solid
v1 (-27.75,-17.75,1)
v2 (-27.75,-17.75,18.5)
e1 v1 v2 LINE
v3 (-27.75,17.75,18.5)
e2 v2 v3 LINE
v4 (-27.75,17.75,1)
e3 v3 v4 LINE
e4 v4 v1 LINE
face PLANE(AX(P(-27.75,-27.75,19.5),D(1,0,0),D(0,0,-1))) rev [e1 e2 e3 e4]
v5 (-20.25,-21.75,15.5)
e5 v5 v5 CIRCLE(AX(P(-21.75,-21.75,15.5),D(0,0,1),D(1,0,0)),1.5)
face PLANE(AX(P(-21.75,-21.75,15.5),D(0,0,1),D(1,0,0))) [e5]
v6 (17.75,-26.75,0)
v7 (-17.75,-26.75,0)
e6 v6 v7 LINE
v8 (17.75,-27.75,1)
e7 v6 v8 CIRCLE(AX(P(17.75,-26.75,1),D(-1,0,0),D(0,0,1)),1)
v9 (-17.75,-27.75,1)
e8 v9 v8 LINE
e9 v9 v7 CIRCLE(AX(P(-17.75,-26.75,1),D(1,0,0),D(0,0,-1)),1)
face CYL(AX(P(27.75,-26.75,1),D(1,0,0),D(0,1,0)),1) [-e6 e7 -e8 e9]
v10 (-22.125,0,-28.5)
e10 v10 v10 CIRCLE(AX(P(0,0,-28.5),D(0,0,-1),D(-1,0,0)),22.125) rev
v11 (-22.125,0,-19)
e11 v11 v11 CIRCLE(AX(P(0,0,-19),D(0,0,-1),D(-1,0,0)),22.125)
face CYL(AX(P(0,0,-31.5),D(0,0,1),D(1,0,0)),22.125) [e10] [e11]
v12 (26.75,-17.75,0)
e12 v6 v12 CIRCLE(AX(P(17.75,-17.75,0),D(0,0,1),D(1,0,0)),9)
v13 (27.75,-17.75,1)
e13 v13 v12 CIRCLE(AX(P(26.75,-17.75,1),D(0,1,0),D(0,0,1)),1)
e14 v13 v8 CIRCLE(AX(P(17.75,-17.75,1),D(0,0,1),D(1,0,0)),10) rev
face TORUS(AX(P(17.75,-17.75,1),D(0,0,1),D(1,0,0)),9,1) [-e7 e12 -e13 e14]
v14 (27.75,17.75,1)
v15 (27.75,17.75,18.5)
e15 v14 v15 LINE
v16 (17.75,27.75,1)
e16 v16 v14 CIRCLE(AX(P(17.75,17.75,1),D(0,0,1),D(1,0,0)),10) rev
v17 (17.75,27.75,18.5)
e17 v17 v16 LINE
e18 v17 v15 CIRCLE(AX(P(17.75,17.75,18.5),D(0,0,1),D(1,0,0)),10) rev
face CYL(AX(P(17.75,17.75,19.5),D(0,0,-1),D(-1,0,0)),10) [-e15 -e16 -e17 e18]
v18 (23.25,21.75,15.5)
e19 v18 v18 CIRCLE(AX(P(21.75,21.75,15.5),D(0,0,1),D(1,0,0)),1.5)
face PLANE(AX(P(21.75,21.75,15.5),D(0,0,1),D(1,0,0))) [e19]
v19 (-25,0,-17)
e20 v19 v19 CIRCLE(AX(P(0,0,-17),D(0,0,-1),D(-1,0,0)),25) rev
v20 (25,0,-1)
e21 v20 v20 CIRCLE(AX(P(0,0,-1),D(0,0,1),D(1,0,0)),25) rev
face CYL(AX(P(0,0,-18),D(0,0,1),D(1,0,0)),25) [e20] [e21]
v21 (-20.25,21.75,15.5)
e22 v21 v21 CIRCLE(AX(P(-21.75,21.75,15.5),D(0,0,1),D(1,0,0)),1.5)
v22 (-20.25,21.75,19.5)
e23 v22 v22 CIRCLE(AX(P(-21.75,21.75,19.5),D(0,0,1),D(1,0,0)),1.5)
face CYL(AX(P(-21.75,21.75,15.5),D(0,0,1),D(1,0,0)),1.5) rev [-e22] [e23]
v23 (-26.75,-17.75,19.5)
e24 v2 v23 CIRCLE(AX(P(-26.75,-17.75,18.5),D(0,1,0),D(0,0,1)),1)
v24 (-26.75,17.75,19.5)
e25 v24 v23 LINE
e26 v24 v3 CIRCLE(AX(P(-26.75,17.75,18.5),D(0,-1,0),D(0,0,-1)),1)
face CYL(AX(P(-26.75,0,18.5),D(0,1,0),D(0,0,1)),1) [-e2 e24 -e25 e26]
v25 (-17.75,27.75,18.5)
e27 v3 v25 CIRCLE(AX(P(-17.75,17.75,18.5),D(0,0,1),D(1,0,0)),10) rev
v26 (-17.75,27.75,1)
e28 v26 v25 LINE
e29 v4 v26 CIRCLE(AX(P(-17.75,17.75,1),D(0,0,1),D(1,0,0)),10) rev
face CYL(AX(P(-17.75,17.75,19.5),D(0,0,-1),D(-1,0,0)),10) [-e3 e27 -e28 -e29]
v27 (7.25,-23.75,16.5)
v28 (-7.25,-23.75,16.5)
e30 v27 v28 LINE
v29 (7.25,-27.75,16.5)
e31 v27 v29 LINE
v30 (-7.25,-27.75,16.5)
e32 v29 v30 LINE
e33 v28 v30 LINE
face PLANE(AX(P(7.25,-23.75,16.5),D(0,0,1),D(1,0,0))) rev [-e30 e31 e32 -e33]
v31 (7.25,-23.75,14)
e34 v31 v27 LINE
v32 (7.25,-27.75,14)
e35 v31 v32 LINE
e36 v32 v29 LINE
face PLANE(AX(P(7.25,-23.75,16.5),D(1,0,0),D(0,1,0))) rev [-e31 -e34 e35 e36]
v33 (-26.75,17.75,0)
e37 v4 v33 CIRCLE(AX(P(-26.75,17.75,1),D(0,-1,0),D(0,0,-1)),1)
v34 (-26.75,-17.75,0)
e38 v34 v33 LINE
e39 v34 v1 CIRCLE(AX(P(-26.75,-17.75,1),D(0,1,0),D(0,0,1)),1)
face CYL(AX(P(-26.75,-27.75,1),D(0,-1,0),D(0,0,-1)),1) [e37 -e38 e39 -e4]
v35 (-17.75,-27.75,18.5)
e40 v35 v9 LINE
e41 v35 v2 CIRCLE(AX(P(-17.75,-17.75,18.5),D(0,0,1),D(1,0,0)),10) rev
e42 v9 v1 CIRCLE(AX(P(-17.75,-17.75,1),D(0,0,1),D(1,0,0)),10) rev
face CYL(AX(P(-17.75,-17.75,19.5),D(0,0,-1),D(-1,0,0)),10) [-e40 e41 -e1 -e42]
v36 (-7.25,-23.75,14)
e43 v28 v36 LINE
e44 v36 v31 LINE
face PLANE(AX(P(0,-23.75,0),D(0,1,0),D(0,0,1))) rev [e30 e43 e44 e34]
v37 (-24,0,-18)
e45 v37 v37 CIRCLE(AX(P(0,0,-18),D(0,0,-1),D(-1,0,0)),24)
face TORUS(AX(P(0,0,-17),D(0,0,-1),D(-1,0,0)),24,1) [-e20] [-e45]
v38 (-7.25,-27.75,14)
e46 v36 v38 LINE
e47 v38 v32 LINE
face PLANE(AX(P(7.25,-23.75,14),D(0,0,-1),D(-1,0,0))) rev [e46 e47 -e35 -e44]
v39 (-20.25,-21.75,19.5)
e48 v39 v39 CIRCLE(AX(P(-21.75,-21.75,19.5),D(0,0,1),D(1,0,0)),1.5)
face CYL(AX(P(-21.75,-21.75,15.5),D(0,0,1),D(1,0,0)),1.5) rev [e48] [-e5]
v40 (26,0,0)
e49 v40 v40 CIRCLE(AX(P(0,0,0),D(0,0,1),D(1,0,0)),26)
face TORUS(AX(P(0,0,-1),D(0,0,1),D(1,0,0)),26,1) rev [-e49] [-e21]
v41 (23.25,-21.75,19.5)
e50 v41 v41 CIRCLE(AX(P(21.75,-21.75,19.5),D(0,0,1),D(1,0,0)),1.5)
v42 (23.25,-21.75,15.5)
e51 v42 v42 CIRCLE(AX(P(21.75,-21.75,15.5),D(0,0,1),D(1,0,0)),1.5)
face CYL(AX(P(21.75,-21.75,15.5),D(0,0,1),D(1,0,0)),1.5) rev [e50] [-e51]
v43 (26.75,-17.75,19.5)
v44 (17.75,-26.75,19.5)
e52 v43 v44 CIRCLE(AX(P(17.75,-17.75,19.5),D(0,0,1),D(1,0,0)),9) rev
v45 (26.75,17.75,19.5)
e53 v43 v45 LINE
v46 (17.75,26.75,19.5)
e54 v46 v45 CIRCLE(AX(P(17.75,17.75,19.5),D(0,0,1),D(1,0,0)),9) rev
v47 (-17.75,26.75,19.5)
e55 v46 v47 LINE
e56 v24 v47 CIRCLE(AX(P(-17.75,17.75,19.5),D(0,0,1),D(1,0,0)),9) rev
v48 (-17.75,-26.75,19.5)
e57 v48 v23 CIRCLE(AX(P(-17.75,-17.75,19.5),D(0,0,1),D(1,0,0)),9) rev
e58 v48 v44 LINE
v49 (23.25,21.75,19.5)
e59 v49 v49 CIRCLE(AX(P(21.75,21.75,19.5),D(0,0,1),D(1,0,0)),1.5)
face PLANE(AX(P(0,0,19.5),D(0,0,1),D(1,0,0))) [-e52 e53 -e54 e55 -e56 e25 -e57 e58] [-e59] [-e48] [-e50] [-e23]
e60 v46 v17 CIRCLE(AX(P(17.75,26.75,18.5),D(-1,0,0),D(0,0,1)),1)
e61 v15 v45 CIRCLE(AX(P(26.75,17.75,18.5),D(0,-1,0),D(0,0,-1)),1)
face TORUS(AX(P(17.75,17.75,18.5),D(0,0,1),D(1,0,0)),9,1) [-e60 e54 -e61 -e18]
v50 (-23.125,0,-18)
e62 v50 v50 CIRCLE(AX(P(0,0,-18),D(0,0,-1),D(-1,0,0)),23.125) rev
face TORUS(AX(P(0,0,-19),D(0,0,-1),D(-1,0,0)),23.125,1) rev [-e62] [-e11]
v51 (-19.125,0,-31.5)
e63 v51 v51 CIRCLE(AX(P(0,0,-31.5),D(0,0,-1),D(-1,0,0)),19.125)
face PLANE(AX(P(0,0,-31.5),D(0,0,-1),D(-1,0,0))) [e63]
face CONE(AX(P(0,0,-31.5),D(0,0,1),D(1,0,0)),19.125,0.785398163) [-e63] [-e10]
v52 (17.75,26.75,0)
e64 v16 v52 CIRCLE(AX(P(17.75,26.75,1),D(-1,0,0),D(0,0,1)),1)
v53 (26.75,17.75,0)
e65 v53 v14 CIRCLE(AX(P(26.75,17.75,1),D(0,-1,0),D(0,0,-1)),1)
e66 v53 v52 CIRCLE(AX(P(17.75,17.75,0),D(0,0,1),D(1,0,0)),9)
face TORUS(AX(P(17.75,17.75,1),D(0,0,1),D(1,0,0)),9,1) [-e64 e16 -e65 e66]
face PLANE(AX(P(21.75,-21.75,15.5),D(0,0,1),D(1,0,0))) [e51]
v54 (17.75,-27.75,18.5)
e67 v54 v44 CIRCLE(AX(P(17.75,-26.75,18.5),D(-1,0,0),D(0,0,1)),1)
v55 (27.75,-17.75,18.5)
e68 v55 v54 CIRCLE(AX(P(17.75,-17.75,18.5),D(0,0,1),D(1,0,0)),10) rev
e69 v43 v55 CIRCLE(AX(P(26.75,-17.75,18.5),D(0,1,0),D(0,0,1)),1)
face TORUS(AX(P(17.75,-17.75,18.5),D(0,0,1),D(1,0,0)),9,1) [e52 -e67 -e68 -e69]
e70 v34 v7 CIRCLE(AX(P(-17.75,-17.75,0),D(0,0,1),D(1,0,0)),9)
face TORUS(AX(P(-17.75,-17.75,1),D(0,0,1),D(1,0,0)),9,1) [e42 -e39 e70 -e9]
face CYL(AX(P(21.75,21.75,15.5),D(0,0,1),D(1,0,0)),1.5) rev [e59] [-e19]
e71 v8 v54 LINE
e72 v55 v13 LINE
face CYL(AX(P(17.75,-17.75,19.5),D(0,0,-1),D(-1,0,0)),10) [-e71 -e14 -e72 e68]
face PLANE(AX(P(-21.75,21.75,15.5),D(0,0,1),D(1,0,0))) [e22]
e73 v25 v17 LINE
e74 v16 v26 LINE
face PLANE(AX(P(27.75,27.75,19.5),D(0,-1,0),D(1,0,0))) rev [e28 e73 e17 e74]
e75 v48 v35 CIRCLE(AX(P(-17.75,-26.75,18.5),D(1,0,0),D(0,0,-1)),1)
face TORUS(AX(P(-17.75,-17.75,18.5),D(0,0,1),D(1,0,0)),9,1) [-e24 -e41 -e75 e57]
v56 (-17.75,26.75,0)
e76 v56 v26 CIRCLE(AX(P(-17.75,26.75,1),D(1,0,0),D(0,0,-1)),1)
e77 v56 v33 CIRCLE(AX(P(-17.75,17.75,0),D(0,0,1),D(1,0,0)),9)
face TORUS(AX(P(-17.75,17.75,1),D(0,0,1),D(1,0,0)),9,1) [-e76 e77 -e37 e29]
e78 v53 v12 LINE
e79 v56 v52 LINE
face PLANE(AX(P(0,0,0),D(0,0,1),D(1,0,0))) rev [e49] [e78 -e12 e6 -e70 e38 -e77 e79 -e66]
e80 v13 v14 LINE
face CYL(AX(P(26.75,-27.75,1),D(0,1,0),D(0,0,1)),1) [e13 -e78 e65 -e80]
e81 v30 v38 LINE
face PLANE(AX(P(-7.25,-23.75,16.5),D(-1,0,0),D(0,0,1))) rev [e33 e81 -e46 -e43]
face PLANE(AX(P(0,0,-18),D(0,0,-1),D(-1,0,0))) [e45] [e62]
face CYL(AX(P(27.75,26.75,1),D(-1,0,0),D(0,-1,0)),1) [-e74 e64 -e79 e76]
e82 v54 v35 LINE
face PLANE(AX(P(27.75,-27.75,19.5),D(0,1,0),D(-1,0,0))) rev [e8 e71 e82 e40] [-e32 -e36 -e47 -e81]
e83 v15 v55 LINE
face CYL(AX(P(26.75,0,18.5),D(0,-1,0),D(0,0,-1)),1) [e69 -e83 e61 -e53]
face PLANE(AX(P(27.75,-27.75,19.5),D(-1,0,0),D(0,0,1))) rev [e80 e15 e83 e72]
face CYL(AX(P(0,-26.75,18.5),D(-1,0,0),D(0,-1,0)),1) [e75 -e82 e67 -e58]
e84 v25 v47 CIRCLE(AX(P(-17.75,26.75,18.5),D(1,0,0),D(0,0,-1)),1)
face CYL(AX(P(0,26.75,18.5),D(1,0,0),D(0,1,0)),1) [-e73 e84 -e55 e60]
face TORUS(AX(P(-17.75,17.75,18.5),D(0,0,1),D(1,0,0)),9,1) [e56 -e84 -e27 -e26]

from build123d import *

# Parameters (mm, degrees)
ESQUISSE1_W             = 55.5
ESQUISSE1_H             = 55.5
BOSS_EXTRU_1_DEPTH      = 19.5
ESQUISSE2_R             = 25
BOSS_EXTRU_2_DEPTH      = 18
ESQUISSE3_R             = 22.125
BOSS_EXTRU_3_DEPTH      = 13.5
CHANFREIN1_SIZE         = 3
CONG_1_R                = 1
CONG_2_R                = 10
ESQUISSE4_R             = 1.5
ENL_V_MAT_EXTRU_1_DEPTH = 4
ESQUISSE5_W             = 14.5
ESQUISSE5_H             = 2.5
ENL_V_MAT_EXTRU_2_DEPTH = 4


with BuildPart() as part:
    # Esquisse1 → Boss.-Extru.1 (new body)
    with BuildSketch(Plane.XY):
        Rectangle(ESQUISSE1_W, ESQUISSE1_H)
    extrude(amount=BOSS_EXTRU_1_DEPTH)

    # Esquisse2 → Boss.-Extru.2 (add)
    with BuildSketch(Plane(origin=(0, 0, 0), x_dir=(-1, 0, 0), z_dir=(0, 0, -1))):
        Circle(ESQUISSE2_R)
    extrude(amount=BOSS_EXTRU_2_DEPTH)

    # Esquisse3 → Boss.-Extru.3 (add)
    with BuildSketch(Plane(origin=(0, 0, -18), x_dir=(-1, 0, 0), z_dir=(0, 0, -1))):
        Circle(ESQUISSE3_R)
    extrude(amount=BOSS_EXTRU_3_DEPTH)

    # Chanfrein1
    chanfrein1_edges = [part.edges().sort_by_distance(p)[0] for p in [
        (22.125, 0, -31.5),
    ]]
    chamfer(chanfrein1_edges, length=CHANFREIN1_SIZE)

    # Congé1
    cong_1_edges = [part.edges().sort_by_distance(p)[0] for p in [
        (27.75, 0, 19.5),
        (25, 0, 0),
        (25, 0, -18),
        (0, 27.75, 19.5),
        (22.125, 0, -18),
        (-27.75, 0, 19.5),
        (0, 27.75, 0),
        (27.75, 0, 0),
        (0, -27.75, 0),
        (-27.75, 0, 0),
        (0, -27.75, 19.5),
    ]]
    fillet(cong_1_edges, radius=CONG_1_R)

    # Congé2
    # the kernel refuses this fillet: 10 mm, written as the material it takes off along each edge
    with BuildSketch(Plane(origin=(17.75, -17.75, 19.5), x_dir=(0, -1, 0), z_dir=(-1, 0, 0))) as cong_2_piece_1:
        with BuildLine():
            CenterArc((9, -1), 1, 0, 90)
            Line((10, -1), (10, 0))
            Line((10, 0), (9, 0))
        make_face()
    revolve(axis=Axis((17.75, -17.75, 19.5), (0, 0, 1)), revolution_arc=90, mode=Mode.SUBTRACT)
    with BuildSketch(Plane(origin=(-17.75, -17.75, 19.5), x_dir=(-1, 0, 0), z_dir=(0, 1, 0))) as cong_2_piece_2:
        with BuildLine():
            CenterArc((9, -1), 1, 0, 90)
            Line((10, -1), (10, 0))
            Line((10, 0), (9, 0))
        make_face()
    revolve(axis=Axis((-17.75, -17.75, 19.5), (0, 0, 1)), revolution_arc=90, mode=Mode.SUBTRACT)
    with BuildSketch(Plane(origin=(17.75, 17.75, 19.5), x_dir=(1, 0, 0), z_dir=(0, -1, 0))) as cong_2_piece_3:
        with BuildLine():
            CenterArc((9, -1), 1, 0, 90)
            Line((10, -1), (10, 0))
            Line((10, 0), (9, 0))
        make_face()
    revolve(axis=Axis((17.75, 17.75, 19.5), (0, 0, 1)), revolution_arc=90, mode=Mode.SUBTRACT)
    with BuildSketch(Plane(origin=(-17.75, 17.75, 19.5), x_dir=(0, 1, 0), z_dir=(1, 0, 0))) as cong_2_piece_4:
        with BuildLine():
            CenterArc((9, -1), 1, 0, 90)
            Line((10, -1), (10, 0))
            Line((10, 0), (9, 0))
        make_face()
    revolve(axis=Axis((-17.75, 17.75, 19.5), (0, 0, 1)), revolution_arc=90, mode=Mode.SUBTRACT)
    with BuildSketch(Plane(origin=(17.75, 17.75, 0), x_dir=(0, 1, 0), z_dir=(-1, 0, 0))) as cong_2_piece_5:
        with BuildLine():
            CenterArc((9, -1), 1, 0, 90)
            Line((10, -1), (10, 0))
            Line((10, 0), (9, 0))
        make_face()
    revolve(axis=Axis((17.75, 17.75, 0), (0, 0, -1)), revolution_arc=90, mode=Mode.SUBTRACT)
    with BuildSketch(Plane(origin=(17.75, -17.75, 0), x_dir=(1, 0, 0), z_dir=(0, 1, 0))) as cong_2_piece_6:
        with BuildLine():
            CenterArc((9, -1), 1, 0, 90)
            Line((10, -1), (10, 0))
            Line((10, 0), (9, 0))
        make_face()
    revolve(axis=Axis((17.75, -17.75, 0), (0, 0, -1)), revolution_arc=90, mode=Mode.SUBTRACT)
    with BuildSketch(Plane(origin=(-17.75, 17.75, 0), x_dir=(-1, 0, 0), z_dir=(0, -1, 0))) as cong_2_piece_7:
        with BuildLine():
            CenterArc((9, -1), 1, 0, 90)
            Line((10, -1), (10, 0))
            Line((10, 0), (9, 0))
        make_face()
    revolve(axis=Axis((-17.75, 17.75, 0), (0, 0, -1)), revolution_arc=90, mode=Mode.SUBTRACT)
    with BuildSketch(Plane(origin=(-17.75, -17.75, 0), x_dir=(0, -1, 0), z_dir=(1, 0, 0))) as cong_2_piece_8:
        with BuildLine():
            CenterArc((9, -1), 1, 0, 90)
            Line((10, -1), (10, 0))
            Line((10, 0), (9, 0))
        make_face()
    revolve(axis=Axis((-17.75, -17.75, 0), (0, 0, -1)), revolution_arc=90, mode=Mode.SUBTRACT)
    with BuildSketch(Plane(origin=(-27.75, 27.75, 0), x_dir=(1, 0, 0), z_dir=(0, 0, 1)), Plane(origin=(-27.75, -27.75, 0), x_dir=(0, 1, 0), z_dir=(0, 0, 1))) as cong_2_piece_9:
        with BuildLine():
            CenterArc((CONG_2_R, -CONG_2_R), CONG_2_R, 90, 90)
            Line((0, -CONG_2_R), (0, 0))
            Line((0, 0), (CONG_2_R, 0))
        make_face()
    extrude(amount=19.5, mode=Mode.SUBTRACT)
    with BuildSketch(Plane(origin=(27.75, 27.75, 0), x_dir=(-1, 0, 0), z_dir=(0, 0, 1)), Plane(origin=(27.75, -27.75, 0), x_dir=(0, 1, 0), z_dir=(0, 0, 1))) as cong_2_piece_10:
        with BuildLine():
            CenterArc((CONG_2_R, CONG_2_R), CONG_2_R, 180, 90)
            Line((0, CONG_2_R), (0, 0))
            Line((0, 0), (CONG_2_R, 0))
        make_face()
    extrude(amount=19.5, mode=Mode.SUBTRACT)

    # Esquisse4 → Enlèv. mat.-Extru.1 (cut)
    with BuildSketch(Plane.XY.offset(19.5)):
        with Locations((-21.75, 21.75)):
            Circle(ESQUISSE4_R)
        with Locations((21.75, 21.75)):
            Circle(ESQUISSE4_R)
        with Locations((21.75, -21.75)):
            Circle(ESQUISSE4_R)
        with Locations((-21.75, -21.75)):
            Circle(ESQUISSE4_R)
    extrude(amount=-ENL_V_MAT_EXTRU_1_DEPTH, mode=Mode.SUBTRACT)

    # Esquisse5 → Enlèv. mat.-Extru.2 (cut)
    with BuildSketch(Plane.XZ.offset(27.75)):
        with Locations((0, 15.25)):
            Rectangle(ESQUISSE5_W, ESQUISSE5_H)
    extrude(amount=-ENL_V_MAT_EXTRU_2_DEPTH, mode=Mode.SUBTRACT)


solid = part.part
